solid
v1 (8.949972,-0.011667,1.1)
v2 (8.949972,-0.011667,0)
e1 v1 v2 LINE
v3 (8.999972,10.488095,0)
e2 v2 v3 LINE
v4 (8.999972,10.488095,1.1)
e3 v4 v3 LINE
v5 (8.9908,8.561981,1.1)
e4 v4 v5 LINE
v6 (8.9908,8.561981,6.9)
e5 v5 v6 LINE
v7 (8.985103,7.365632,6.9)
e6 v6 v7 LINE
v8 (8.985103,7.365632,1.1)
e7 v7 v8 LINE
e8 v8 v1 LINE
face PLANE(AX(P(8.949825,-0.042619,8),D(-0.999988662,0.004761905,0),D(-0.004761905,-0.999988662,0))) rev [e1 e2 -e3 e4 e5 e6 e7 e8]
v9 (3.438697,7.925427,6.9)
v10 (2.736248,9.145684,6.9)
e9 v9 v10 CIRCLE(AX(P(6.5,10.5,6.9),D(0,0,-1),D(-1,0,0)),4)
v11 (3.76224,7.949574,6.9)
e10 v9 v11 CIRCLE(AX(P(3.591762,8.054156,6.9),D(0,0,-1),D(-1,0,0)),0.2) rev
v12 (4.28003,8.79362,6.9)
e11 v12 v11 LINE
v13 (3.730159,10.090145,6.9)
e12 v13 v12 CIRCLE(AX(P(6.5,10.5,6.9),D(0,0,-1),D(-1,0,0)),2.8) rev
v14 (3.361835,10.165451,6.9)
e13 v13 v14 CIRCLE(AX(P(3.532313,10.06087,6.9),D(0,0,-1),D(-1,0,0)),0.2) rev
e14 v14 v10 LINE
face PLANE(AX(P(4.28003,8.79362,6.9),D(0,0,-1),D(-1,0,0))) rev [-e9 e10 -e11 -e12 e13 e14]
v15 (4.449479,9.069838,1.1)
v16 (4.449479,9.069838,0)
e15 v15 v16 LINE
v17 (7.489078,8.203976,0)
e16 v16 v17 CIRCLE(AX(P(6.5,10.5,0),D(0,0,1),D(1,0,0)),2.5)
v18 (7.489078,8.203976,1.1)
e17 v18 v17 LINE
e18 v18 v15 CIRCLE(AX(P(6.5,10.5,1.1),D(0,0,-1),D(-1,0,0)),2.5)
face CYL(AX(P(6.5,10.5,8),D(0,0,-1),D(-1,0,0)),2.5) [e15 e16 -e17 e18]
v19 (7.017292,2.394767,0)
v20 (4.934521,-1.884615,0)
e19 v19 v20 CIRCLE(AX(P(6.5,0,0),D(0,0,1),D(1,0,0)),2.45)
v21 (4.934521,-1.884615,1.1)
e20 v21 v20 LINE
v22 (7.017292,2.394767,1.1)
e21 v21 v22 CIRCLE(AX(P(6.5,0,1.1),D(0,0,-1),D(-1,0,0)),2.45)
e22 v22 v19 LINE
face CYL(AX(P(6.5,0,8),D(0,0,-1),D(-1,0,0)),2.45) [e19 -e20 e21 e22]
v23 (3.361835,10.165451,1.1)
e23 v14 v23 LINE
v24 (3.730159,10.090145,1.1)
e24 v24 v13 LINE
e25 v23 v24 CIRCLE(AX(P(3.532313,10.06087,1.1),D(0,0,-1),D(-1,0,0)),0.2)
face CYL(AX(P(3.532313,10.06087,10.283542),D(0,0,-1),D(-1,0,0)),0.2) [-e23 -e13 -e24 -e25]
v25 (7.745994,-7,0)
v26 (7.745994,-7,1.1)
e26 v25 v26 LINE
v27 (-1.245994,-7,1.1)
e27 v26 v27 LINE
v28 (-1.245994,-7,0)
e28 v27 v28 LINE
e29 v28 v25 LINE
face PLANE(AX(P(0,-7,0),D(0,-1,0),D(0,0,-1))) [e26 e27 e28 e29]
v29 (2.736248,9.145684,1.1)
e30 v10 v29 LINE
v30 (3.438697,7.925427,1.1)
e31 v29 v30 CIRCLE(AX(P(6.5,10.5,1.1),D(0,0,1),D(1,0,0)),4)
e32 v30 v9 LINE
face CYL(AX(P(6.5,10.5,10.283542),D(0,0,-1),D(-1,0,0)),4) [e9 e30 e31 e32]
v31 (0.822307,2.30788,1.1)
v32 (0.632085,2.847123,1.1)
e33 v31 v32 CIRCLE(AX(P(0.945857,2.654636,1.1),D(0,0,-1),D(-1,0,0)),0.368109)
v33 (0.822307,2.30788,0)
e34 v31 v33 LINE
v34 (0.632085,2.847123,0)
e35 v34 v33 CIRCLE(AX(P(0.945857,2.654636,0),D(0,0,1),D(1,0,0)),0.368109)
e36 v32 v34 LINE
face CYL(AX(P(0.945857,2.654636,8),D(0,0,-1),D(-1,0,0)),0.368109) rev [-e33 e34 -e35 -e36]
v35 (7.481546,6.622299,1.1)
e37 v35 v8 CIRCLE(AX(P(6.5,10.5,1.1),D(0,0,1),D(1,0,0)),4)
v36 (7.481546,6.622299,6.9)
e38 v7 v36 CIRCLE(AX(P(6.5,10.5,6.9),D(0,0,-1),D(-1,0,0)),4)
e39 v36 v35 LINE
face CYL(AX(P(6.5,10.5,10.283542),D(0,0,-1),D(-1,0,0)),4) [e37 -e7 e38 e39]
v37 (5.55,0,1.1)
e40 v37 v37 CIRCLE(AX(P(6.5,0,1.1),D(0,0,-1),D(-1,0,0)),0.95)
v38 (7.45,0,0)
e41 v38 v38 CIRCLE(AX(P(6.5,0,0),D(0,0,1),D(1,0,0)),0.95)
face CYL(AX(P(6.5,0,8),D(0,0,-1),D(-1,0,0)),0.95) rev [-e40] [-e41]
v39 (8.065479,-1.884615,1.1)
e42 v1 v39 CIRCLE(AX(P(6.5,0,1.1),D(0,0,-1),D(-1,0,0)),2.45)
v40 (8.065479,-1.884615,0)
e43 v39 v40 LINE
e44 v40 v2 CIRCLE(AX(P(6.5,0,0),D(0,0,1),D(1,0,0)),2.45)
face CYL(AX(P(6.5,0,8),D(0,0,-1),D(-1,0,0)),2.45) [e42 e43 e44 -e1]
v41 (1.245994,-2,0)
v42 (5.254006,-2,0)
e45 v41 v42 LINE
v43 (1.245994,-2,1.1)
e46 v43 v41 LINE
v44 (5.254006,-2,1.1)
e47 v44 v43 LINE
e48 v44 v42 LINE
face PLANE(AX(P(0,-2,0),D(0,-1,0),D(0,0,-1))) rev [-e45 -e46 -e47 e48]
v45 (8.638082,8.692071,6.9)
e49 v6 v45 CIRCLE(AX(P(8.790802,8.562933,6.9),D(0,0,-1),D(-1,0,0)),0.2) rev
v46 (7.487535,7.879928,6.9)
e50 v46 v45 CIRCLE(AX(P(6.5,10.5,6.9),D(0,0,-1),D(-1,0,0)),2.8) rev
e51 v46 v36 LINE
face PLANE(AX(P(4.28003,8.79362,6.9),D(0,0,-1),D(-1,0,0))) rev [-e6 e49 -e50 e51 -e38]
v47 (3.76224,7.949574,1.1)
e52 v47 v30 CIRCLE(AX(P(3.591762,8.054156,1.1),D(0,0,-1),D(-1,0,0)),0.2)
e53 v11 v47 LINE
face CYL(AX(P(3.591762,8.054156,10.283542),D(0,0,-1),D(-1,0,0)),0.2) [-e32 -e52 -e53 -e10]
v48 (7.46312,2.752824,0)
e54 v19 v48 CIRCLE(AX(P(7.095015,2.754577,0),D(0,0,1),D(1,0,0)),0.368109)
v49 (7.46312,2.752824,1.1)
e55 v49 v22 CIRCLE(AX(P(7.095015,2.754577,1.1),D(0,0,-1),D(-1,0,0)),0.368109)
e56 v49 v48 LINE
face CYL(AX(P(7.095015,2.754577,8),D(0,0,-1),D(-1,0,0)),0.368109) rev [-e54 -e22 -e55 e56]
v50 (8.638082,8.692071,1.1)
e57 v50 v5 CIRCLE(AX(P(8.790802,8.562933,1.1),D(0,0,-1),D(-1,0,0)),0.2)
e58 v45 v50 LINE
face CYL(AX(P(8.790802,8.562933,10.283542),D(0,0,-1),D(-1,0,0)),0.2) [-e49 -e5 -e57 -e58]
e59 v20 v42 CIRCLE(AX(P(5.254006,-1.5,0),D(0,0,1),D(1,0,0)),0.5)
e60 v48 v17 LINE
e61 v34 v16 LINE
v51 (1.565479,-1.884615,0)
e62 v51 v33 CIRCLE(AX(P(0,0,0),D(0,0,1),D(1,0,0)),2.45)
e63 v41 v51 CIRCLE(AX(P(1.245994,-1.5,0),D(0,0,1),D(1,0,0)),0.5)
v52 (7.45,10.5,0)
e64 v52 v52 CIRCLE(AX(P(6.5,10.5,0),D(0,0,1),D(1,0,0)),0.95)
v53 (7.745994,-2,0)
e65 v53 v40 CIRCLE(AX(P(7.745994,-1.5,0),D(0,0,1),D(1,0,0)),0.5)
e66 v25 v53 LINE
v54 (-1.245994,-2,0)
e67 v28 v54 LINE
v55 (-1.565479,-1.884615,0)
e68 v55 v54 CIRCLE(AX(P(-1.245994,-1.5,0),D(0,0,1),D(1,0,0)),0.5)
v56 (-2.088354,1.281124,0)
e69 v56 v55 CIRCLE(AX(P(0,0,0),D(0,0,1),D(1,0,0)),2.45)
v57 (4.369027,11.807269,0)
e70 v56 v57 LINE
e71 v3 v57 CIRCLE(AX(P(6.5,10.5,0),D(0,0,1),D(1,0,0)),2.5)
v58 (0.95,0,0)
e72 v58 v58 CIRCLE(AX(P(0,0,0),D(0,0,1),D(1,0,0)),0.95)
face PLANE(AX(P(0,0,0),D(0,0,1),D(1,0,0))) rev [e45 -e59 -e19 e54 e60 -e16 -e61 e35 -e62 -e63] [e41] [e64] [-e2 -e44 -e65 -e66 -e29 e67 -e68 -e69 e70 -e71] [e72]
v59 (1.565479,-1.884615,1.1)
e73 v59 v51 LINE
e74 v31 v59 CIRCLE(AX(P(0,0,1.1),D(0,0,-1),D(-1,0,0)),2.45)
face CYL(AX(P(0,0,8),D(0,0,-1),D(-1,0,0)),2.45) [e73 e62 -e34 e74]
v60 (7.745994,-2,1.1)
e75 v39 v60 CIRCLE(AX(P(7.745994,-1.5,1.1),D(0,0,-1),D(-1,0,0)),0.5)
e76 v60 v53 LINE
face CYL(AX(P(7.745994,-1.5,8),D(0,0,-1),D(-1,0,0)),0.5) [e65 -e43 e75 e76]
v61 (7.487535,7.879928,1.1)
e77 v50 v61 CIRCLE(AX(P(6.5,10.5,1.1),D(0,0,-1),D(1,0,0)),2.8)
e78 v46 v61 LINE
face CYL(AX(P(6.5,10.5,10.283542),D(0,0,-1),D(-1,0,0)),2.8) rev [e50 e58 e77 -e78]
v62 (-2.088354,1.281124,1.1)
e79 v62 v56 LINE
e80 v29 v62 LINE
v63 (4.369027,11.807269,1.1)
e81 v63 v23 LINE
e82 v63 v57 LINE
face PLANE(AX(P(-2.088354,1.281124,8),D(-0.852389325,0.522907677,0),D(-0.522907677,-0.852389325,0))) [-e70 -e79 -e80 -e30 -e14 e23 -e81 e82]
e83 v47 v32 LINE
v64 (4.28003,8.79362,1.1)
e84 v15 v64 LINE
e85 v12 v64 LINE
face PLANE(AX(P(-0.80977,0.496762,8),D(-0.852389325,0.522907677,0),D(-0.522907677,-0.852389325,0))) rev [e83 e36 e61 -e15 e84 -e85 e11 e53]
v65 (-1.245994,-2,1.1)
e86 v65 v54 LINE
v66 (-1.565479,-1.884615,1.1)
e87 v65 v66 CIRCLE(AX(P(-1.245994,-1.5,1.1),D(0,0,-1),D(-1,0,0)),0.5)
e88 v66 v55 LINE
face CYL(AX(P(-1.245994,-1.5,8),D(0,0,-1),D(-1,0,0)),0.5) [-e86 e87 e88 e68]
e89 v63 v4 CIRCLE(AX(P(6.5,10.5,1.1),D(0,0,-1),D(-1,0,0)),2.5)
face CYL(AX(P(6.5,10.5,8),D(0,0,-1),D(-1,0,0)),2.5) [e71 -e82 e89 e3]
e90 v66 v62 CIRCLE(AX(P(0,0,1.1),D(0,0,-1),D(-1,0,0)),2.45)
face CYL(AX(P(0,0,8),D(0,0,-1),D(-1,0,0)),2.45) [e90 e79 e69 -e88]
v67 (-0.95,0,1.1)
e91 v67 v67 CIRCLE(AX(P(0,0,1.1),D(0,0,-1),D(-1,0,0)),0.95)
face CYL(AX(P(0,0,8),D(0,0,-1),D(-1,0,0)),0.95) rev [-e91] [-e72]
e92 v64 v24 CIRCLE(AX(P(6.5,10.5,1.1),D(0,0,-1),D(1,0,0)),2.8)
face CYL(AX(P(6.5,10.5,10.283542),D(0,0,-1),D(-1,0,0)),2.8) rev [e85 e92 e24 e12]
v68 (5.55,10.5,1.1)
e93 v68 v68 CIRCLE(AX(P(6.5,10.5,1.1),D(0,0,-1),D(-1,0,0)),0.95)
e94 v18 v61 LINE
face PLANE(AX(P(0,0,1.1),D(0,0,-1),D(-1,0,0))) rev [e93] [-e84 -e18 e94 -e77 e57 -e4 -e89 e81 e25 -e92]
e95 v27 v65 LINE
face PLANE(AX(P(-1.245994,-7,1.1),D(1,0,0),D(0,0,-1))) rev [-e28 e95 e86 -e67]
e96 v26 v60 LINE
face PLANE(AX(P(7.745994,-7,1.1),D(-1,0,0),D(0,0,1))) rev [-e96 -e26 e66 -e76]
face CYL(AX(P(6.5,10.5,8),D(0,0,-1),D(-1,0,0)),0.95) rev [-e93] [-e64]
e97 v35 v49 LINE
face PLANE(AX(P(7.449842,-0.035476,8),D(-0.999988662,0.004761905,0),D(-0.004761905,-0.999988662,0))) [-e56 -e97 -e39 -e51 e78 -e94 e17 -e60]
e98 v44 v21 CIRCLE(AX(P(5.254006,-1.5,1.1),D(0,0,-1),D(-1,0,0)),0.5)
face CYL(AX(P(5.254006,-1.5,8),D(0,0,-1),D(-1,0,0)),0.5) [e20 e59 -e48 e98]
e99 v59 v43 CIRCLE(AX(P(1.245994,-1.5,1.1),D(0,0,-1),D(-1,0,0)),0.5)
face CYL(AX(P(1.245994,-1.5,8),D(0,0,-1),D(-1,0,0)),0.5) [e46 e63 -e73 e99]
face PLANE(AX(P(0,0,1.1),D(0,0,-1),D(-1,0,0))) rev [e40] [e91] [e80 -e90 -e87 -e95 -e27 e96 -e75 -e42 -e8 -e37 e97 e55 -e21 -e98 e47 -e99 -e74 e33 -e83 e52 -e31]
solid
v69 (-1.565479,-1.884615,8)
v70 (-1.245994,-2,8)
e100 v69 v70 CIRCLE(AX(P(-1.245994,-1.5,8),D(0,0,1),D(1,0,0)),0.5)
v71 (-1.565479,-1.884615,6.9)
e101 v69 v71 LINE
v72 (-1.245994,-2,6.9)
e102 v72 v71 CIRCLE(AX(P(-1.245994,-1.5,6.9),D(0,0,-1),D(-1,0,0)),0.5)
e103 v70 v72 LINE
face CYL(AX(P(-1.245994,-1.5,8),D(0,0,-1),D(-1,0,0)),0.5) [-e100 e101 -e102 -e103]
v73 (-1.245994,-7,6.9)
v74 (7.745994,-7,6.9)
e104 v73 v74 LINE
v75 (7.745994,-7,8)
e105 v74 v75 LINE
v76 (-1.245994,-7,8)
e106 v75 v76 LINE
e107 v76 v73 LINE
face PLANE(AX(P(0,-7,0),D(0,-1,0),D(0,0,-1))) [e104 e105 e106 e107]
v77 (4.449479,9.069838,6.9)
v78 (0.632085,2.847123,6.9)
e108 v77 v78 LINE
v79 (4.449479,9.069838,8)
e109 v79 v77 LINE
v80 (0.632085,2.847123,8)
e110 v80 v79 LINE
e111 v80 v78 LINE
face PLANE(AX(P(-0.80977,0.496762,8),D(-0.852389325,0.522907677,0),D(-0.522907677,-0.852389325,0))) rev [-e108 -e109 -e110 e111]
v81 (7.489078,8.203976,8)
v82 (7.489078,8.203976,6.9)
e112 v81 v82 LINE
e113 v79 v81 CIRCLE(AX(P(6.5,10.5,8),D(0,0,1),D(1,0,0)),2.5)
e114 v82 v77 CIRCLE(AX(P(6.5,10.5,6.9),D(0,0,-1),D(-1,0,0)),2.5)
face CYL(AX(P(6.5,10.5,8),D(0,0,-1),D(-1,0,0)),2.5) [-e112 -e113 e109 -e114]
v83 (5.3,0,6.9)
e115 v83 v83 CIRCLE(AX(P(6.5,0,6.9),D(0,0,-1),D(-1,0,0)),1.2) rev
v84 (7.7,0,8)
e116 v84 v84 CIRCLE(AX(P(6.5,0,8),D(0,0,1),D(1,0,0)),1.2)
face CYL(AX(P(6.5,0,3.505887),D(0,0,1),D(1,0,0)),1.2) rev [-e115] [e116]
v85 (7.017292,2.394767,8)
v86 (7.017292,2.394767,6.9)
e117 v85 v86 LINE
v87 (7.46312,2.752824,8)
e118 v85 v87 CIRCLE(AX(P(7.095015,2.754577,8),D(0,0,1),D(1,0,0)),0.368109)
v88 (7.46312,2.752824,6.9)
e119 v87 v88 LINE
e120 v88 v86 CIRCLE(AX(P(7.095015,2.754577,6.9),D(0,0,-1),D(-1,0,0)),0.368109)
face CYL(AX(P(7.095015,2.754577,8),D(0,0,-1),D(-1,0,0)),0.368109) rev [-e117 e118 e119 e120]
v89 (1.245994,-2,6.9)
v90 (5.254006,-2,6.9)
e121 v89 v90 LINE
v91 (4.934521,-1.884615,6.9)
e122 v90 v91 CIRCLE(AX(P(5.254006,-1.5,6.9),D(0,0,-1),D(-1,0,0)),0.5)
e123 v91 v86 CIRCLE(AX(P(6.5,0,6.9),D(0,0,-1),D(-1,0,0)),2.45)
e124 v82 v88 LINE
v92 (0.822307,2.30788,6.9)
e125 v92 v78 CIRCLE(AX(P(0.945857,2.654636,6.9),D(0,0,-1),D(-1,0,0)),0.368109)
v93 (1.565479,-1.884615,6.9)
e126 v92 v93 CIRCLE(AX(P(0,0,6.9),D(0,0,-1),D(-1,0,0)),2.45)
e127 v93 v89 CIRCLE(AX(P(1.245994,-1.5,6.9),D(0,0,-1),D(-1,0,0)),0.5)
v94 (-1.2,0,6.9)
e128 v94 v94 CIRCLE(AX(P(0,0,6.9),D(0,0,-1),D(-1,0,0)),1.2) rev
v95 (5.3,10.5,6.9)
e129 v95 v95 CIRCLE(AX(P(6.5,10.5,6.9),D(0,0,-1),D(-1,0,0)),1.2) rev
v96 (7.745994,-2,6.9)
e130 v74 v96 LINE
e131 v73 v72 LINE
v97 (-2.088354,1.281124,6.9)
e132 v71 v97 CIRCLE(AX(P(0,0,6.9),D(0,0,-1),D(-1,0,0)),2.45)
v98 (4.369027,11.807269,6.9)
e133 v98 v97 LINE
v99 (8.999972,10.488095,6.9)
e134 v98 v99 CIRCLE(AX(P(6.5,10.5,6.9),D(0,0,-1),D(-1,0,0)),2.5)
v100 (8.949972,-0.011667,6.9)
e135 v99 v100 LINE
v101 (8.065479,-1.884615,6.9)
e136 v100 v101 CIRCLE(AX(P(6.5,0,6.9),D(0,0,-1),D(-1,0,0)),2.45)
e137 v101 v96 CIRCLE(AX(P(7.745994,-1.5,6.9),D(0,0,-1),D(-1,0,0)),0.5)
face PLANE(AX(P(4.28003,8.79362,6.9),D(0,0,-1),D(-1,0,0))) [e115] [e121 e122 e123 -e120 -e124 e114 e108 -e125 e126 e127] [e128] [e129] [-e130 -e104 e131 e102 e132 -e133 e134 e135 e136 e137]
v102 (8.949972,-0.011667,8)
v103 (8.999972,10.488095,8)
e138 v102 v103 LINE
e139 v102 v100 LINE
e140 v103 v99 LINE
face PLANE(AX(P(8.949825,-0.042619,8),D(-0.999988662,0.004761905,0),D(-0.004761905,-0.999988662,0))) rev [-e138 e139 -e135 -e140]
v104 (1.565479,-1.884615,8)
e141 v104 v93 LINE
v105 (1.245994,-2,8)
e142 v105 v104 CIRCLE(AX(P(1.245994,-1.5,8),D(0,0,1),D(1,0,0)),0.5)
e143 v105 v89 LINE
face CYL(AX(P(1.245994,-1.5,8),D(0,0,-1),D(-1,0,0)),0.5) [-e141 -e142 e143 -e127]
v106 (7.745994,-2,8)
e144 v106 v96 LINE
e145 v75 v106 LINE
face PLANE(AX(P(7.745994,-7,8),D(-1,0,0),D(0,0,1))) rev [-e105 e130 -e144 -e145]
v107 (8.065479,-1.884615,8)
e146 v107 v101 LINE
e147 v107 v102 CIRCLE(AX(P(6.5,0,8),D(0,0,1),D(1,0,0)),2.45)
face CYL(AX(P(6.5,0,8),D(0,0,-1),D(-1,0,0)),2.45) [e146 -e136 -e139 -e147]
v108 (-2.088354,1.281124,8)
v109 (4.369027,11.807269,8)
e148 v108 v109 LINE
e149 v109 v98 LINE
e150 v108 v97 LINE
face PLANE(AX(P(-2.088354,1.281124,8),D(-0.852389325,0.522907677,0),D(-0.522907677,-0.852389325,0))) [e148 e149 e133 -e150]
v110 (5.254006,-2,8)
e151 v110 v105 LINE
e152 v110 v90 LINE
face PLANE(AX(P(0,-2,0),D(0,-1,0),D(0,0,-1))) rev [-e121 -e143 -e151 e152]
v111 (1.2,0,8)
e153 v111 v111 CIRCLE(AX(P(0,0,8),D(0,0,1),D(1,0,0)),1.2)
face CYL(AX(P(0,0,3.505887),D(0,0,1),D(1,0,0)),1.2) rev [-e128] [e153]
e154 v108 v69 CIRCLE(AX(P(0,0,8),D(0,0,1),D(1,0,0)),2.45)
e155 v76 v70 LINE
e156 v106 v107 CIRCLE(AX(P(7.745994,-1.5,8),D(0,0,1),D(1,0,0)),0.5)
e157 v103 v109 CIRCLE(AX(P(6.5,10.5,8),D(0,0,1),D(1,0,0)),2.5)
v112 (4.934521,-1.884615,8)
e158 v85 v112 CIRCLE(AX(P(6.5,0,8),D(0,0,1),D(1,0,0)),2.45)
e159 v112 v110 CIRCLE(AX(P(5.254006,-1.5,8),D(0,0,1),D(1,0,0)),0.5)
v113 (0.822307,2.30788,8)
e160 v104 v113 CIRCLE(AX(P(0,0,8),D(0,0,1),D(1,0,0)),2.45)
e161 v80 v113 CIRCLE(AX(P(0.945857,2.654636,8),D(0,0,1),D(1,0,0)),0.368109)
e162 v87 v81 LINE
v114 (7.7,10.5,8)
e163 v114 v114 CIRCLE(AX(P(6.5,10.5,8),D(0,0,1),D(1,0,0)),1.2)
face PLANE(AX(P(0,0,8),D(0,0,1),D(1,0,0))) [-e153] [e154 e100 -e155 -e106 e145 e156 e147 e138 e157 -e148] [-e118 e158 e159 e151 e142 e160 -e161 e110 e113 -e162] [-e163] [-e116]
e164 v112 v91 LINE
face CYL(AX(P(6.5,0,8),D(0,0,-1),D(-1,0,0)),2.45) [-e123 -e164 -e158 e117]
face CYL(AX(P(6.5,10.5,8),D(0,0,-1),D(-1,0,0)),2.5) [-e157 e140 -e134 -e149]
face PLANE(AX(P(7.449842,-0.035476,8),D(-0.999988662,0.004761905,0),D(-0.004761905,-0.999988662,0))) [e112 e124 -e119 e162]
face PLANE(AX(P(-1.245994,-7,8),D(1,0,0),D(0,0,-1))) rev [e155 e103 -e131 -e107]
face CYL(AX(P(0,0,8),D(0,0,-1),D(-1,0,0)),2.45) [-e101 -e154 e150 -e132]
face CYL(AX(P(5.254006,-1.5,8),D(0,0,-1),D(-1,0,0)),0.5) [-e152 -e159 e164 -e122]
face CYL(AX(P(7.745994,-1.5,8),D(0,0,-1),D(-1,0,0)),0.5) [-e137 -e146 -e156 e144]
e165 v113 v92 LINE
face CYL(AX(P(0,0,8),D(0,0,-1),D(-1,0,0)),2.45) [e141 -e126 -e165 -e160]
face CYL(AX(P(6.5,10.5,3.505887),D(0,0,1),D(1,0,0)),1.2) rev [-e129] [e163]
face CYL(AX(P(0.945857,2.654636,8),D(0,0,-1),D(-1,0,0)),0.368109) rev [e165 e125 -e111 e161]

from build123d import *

# Parameters (mm, degrees)
HOUSING_R           = 0.9499999999999998
HOUSING_R_2         = 0.9500000000000001
HOUSING_R_3         = 0.95
BOSS_EXTRUDE1_DEPTH = 8
CUT_EXTRUDE1_DEPTH  = 2.9
BOSS_EXTRUDE2_DEPTH = 5.8
FILLET1_R           = 0.2
SKETCH4_R           = 1.1999999999999995
SKETCH4_R_2         = 1.2
CUT_EXTRUDE2_DEPTH  = 1.1
SKETCH5_W           = 8.991987158875418
SKETCH5_H           = 1.1000000000000005
SKETCH5_H_2         = 1.1000000000000003
BOSS_EXTRUDE3_DEPTH = 5


# Read off the part's stored shape, not the designer's step: Split1
with BuildPart() as part:
    # housing → Boss-Extrude1 (new body)
    with BuildSketch(Plane.XY):
        with BuildLine():
            ThreePointArc((7.017292273195786, 2.3947669414980512), (7.325518035981619, 2.4675712154204676), (7.463119607499124, 2.752824419893601))
            Line((7.463119607499124, 2.752824419893601), (7.489077767555448, 8.203976226227727))
            ThreePointArc((7.489077767555448, 8.203976226227727), (5.815094951659767, 8.095648720598838), (4.449478668914345, 9.069838375999874))
            Line((4.449478668914345, 9.069838375999874), (0.6320850471381863, 2.847123137185346))
            ThreePointArc((0.6320850471381863, 2.847123137185346), (0.5987139537613061, 2.5321787718236037), (0.8223068369271714, 2.3078802971434254))
            ThreePointArc((0.8223068369271714, 2.3078802971434254), (2.412392058852269, 0.42762665303569264), (1.5654791126268672, -1.8846153846153846))
            ThreePointArc((1.5654791126268672, -1.8846153846153846), (1.415835134559399, -1.9702699715629801), (1.2459935794377088, -2))
            Line((1.2459935794377088, -2), (-1.2459935794377088, -2))
            ThreePointArc((-1.2459935794377088, -2), (-1.4158351345593991, -1.9702699715629806), (-1.5654791126268672, -1.8846153846153846))
            ThreePointArc((-1.5654791126268672, -1.8846153846153846), (-2.4172505006690987, -0.3992493168622683), (-2.0883538457938933, 1.2811238093009794))
            Line((-2.0883538457938933, 1.2811238093009794), (4.369026687965414, 11.80726919316428))
            ThreePointArc((4.369026687965414, 11.80726919316428), (7.184905048340233, 12.90435127940119), (8.999971655168114, 10.488095238095253))
            Line((8.999971655168114, 10.488095238095253), (8.94997222206475, -0.01166666666666699))
            ThreePointArc((8.94997222206475, -0.01166666666666699), (8.715388584500609, -1.046209070723625), (8.065479112626866, -1.8846153846153848))
            ThreePointArc((8.065479112626866, -1.8846153846153848), (7.915835134559398, -1.9702699715629803), (7.745993579437708, -2))
            Line((7.745993579437708, -2), (5.254006420562291, -2))
            ThreePointArc((5.254006420562291, -2), (5.084164865440601, -1.9702699715629801), (4.934520887373134, -1.8846153846153848))
            ThreePointArc((4.934520887373134, -1.8846153846153848), (4.297058288140121, 1.0721696760064878), (7.017292273195786, 2.3947669414980512))
        make_face()
        with Locations((6.5, 10.500000000000014)):
            Circle(HOUSING_R, mode=Mode.SUBTRACT)
        with Locations((6.5, 1.73e-15)):
            Circle(HOUSING_R_2, mode=Mode.SUBTRACT)
        Circle(HOUSING_R_3, mode=Mode.SUBTRACT)
    extrude(amount=BOSS_EXTRUDE1_DEPTH)

    # Sketch2 → Cut-Extrude1 (cut, symmetric)
    with BuildSketch(Plane.XY.offset(4)):
        Polygon((9.299999999999999, 13.000000000000002), (-2.700000000000002, 13), (-2.700000000000001, -3.0000000000000004), (9.3, -2.999999999999999), align=None)
    extrude(amount=CUT_EXTRUDE1_DEPTH, both=True, mode=Mode.SUBTRACT)


with BuildPart() as cut_extrude1_piece_1:
    # of the separate pieces the step leaves, piece 1, a body of its own (cut_extrude1_pieces)
    add(part.part.solids().sort_by_distance((7.017292273, 2.394766941, 0))[0])



with BuildPart() as cut_extrude1_piece_2:
    # of the separate pieces the step leaves, piece 2, a body of its own (cut_extrude1_pieces)
    add(part.part.solids().sort_by_distance((7.463119607, 2.75282442, 6.9))[0])


with BuildPart() as cut_extrude1_piece_1_1:
    add(cut_extrude1_piece_1.part)

    add(cut_extrude1_piece_2.part)  # Boss-Extrude2 merges Cut-Extrude1 piece 2
    # Sketch3 → Boss-Extrude2 (add)
    with BuildSketch(Plane.XY.offset(1.1000000000000003)):
        with BuildLine():
            Line((8.985102612314783, 7.365631641579735), (8.993967121733391, 9.227157513392633))
            ThreePointArc((8.993967121733391, 9.227157513392633), (8.366539647651873, 8.41288961869681), (7.4875346650857, 7.879928381655572))
            Line((7.4875346650857, 7.879928381655572), (7.481545884228164, 6.622298660655433))
            ThreePointArc((7.481545884228164, 6.622298660655433), (8.272723590912673, 6.914271193993949), (8.985102612314783, 7.365631641579735))
        make_face()
        with BuildLine():
            Line((3.6223979495320817, 7.721618017776758), (4.280029641984488, 8.7936203208159))
            ThreePointArc((4.280029641984488, 8.7936203208159), (3.8138220786436623, 9.709779666917052), (3.7096651953681965, 10.732447151112684))
            Line((3.7096651953681965, 10.732447151112684), (2.7362479890296694, 9.145684379505001))
            ThreePointArc((2.7362479890296694, 9.145684379505001), (3.1038422897343154, 8.38668203835701), (3.6223979495320817, 7.721618017776758))
        make_face()
    extrude(amount=BOSS_EXTRUDE2_DEPTH)

    # Fillet1
    fillet1_edges = [cut_extrude1_piece_1_1.edges().sort_by_distance(p)[0] for p in [
        (8.993967121733391, 9.227157513392633, 4),
        (3.6223979495320817, 7.721618017776759, 4),
        (3.7096651953681965, 10.732447151112684, 4),
    ]]
    fillet(fillet1_edges, radius=FILLET1_R)

    # Sketch4 → Cut-Extrude2 (cut)
    with BuildSketch(Plane.XY.offset(8)):
        with Locations((6.5, 10.500000000000014)):
            Circle(SKETCH4_R)
        Circle(SKETCH4_R_2)
        with Locations((6.5, 1.73e-15)):
            Circle(SKETCH4_R)
    extrude(amount=-CUT_EXTRUDE2_DEPTH, mode=Mode.SUBTRACT)

    # Sketch5 → Boss-Extrude3 (add)
    with BuildSketch(Plane.XZ.offset(2)):
        with Locations((3.2499999999999996, 7.449999999999999)):
            Rectangle(SKETCH5_W, SKETCH5_H)
        with Locations((3.2499999999999996, 0.5500000000000002)):
            Rectangle(SKETCH5_W, SKETCH5_H_2)
    extrude(amount=BOSS_EXTRUDE3_DEPTH)


with BuildPart() as body_2:
    # Split1: the piece on the far side of the plane
    add(cut_extrude1_piece_1_1.part)
    split(bisect_by=Plane.XY.offset(6.9), keep=Keep.BOTTOM)


with BuildPart() as cut_extrude1_piece_1_2:
    add(cut_extrude1_piece_1_1.part)

    # Split1
    split(bisect_by=Plane.XY.offset(6.9), keep=Keep.TOP)


solid = Compound([body_2.part, cut_extrude1_piece_1_2.part])
